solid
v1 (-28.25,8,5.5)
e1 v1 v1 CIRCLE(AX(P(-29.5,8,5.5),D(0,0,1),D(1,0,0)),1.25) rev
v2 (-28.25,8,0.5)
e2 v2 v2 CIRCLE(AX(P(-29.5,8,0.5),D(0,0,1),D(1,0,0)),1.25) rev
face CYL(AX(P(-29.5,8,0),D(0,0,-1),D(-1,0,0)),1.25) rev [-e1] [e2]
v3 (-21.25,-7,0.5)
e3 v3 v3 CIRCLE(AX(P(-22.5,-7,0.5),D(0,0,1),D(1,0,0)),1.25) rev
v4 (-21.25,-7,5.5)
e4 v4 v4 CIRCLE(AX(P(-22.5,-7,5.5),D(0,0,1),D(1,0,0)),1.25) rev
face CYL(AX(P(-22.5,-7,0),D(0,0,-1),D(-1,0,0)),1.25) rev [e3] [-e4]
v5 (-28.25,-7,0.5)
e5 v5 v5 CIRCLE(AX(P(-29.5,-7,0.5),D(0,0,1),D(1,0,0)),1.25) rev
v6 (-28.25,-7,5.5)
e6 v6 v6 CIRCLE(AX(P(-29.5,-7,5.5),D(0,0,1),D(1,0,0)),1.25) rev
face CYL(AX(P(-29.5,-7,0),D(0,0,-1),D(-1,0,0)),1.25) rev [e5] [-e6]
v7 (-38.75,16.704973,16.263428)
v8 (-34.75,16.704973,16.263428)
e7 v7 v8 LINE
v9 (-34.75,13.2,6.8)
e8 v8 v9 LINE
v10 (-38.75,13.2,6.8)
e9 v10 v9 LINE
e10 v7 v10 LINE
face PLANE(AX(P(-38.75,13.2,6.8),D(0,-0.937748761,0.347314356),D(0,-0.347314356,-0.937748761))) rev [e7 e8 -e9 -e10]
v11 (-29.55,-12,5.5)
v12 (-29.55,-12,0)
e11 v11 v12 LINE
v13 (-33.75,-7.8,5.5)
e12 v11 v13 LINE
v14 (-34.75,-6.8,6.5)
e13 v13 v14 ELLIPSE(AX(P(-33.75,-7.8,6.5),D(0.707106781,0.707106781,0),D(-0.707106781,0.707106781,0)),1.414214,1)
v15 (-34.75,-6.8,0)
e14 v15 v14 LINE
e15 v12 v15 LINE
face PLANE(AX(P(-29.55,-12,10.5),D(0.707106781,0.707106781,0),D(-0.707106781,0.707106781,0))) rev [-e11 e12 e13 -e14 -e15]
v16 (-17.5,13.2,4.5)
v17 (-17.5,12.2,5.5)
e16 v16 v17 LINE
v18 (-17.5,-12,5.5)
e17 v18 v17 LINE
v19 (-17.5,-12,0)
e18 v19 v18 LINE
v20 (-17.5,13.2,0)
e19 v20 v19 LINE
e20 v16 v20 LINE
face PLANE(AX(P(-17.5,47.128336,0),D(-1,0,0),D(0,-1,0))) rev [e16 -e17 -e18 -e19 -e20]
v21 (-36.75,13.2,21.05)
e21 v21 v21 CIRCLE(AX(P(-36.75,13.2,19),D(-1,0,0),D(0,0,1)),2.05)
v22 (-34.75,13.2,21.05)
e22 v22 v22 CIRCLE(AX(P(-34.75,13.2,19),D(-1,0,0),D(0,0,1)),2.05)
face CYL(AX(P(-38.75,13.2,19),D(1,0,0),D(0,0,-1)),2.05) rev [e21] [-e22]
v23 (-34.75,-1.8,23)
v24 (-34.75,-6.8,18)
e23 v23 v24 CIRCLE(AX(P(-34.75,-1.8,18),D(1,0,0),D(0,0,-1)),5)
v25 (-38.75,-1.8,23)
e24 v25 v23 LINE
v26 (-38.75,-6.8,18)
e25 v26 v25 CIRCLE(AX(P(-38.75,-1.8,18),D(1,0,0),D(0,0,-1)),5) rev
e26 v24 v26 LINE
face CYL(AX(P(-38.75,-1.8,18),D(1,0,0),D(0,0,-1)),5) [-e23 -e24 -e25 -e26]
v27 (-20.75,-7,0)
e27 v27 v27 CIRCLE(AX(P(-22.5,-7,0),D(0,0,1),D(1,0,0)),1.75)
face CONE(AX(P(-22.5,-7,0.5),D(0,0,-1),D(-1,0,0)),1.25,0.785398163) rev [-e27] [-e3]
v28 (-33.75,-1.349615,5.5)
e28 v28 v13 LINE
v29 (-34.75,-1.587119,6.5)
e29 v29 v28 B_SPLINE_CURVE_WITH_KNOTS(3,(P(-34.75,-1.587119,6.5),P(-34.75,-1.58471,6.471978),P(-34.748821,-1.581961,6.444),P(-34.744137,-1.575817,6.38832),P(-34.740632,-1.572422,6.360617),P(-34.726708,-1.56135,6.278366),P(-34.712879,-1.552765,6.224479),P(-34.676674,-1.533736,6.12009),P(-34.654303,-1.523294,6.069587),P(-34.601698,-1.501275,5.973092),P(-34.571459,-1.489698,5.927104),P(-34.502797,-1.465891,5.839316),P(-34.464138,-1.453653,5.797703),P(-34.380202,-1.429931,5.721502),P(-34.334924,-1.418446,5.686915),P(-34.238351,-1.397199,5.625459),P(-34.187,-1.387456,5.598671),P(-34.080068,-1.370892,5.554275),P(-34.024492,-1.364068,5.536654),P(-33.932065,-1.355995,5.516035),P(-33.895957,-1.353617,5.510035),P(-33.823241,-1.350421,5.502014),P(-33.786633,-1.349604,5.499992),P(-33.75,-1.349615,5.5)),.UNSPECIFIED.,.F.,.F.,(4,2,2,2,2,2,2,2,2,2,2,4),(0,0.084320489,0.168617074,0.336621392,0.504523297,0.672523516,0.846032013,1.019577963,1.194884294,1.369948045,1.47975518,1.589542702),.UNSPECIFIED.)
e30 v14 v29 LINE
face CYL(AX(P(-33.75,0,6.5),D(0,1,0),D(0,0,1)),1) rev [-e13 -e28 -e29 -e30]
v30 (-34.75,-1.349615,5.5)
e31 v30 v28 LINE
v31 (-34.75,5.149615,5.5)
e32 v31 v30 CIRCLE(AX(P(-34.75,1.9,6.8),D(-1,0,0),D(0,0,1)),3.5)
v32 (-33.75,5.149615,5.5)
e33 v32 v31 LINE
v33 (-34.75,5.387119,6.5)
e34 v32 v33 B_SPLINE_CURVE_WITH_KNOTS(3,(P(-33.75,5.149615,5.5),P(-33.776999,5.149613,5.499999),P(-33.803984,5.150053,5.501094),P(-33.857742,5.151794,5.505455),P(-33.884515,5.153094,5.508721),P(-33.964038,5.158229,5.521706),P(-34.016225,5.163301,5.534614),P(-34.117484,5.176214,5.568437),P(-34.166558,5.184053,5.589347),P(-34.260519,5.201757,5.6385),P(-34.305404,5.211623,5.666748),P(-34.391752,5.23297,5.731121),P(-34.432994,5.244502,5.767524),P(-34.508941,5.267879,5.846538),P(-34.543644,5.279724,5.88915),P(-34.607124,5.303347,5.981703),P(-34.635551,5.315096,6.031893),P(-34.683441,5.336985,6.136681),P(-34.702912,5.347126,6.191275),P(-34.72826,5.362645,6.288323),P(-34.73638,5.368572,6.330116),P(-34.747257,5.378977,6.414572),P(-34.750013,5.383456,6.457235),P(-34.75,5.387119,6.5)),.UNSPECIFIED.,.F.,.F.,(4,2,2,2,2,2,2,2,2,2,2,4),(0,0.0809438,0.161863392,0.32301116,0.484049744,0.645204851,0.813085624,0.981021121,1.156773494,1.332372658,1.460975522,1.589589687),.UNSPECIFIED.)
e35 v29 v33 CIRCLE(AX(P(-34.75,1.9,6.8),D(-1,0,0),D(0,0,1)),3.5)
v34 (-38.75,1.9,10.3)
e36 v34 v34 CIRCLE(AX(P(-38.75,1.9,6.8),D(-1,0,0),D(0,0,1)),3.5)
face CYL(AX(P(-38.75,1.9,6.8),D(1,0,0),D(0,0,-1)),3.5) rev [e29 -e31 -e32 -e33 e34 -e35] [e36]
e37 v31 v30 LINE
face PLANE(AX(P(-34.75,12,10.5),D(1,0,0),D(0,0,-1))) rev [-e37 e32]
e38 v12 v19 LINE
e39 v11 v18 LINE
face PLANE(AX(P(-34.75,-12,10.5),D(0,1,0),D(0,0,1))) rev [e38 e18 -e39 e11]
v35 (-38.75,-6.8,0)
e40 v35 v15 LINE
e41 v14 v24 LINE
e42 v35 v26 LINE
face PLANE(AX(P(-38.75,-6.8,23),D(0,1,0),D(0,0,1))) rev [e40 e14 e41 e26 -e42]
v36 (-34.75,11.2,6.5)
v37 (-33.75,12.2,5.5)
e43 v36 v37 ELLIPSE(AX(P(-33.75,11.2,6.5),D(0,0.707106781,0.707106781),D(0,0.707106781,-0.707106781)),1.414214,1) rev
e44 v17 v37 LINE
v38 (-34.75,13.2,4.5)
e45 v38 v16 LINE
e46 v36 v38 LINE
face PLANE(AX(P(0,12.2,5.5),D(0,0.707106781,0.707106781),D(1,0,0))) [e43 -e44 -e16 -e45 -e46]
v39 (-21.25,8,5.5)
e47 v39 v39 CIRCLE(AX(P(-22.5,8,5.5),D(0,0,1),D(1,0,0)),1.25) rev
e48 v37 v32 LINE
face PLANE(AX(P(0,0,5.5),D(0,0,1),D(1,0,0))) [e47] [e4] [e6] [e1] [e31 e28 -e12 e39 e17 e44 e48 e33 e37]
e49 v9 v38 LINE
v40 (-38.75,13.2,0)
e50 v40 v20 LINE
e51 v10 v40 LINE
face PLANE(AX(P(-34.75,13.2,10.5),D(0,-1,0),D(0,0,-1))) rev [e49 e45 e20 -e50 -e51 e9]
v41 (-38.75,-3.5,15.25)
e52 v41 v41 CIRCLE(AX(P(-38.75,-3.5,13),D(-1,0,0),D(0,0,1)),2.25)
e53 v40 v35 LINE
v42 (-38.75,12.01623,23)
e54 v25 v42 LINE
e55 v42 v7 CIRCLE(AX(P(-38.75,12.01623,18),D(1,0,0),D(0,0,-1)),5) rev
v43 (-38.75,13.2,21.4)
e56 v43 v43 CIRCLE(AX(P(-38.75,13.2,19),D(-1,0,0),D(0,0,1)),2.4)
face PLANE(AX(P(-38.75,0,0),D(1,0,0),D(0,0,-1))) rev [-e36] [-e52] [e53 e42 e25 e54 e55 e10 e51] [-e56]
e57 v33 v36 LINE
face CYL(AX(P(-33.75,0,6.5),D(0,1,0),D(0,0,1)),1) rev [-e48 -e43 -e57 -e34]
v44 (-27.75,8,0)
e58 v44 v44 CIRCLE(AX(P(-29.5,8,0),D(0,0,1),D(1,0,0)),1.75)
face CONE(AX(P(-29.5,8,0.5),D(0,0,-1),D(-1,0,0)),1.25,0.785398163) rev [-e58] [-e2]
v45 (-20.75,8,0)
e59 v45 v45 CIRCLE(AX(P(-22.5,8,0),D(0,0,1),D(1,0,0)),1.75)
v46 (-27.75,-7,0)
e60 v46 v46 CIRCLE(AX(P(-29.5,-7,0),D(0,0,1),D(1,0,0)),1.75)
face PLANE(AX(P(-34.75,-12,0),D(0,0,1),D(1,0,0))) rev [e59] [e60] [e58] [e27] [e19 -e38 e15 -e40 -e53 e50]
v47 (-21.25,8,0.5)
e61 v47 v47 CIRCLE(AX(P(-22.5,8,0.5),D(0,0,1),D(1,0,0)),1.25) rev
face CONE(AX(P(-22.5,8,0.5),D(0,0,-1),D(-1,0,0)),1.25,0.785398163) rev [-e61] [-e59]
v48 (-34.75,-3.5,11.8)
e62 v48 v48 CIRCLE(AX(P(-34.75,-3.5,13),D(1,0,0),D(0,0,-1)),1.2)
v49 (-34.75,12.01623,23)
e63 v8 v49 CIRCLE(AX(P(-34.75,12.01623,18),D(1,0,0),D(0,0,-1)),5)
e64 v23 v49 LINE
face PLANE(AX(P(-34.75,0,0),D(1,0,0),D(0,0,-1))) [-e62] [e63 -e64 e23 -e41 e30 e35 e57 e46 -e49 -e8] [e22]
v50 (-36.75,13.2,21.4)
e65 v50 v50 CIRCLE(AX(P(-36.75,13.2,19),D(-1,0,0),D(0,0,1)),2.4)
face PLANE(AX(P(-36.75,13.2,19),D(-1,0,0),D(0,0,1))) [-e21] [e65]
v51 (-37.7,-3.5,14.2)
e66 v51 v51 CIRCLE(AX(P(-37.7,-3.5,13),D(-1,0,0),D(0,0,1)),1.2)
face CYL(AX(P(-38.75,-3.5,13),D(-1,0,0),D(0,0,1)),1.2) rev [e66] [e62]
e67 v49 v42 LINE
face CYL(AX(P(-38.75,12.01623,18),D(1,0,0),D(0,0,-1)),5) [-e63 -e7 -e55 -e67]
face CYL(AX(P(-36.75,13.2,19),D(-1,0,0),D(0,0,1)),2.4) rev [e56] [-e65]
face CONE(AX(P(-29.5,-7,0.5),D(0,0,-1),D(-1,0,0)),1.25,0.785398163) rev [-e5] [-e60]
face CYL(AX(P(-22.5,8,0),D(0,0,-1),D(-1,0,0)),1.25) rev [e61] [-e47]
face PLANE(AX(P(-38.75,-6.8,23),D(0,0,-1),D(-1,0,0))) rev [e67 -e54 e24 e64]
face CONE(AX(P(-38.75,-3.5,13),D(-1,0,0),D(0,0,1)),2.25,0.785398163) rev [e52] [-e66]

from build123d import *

# Parameters (mm, degrees)
SKETCH_1_W             = 69.5
SKETCH_1_H             = 24
EXTRUDE_1_DEPTH        = 10.5
SKETCH_2_W             = 35
SKETCH_2_H             = 3
CUT_EXTRUDE_2_DEPTH    = 24
HOLE_WIZARD_M3_1_D     = 2.5
HOLE_WIZARD_M3_1_DEPTH = 7.5
HOLE_WIZARD_M3_1_TIP   = 0.751075774
CHAMFER_1_SIZE         = 0.5
CHAMFER_2_SIZE         = 0.5
CHAMFER_3_SIZE         = 5.2
FILLET1_R              = 2
SKETCH_8_W             = 10.5
SKETCH_8_H             = 1.2
EXTRUDE_1_2_DEPTH      = 69.5
SKETCH_7_W             = 35
SKETCH_7_H             = 30
CUT_EXTRUDE_1_DEPTH    = 71.5
FILLET_1_R             = 2
FILLET_2_R             = 2
SKETCH2_W              = 16.266114445
SKETCH2_H              = 35.800653755
SKETCH2_W_2            = 16.722173729
SKETCH2_H_2            = 38.308979815
EXTRUDE1_DEPTH         = 5
SKETCH4_R              = 2.05
SKETCH4_R_2            = 3.5
EXTRUDE2_DEPTH         = 4
FILLET2_R              = 5
SKETCH7_R              = 3.5
SKETCH7_R_2            = 2.05
EXTRUDE3_DEPTH         = 4
FILLET3_R              = 5
FILLET5_R              = 1
SKETCH14_R             = 2.4
EXTRUDE4_DEPTH         = 2
SKETCH15_R             = 2.4
EXTRUDE5_DEPTH         = 2
SKETCH_9_W             = 36.650882696
SKETCH_9_H             = 47.613245362
CUT_EXTRUDE_2_2_DEPTH  = 49.168282868
SKETCH_10_W            = 16.727542875
SKETCH_10_H            = 39.365484233
CUT_EXTRUDE_3_DEPTH    = 5
CHAMFER_8_SIZE         = 1
FILLET_4_R             = 1


with BuildPart() as part:
    # 草图1 → Extrude 1 (new body)
    with BuildSketch(Plane.XY):
        Rectangle(SKETCH_1_W, SKETCH_1_H)
    extrude(amount=EXTRUDE_1_DEPTH)

    # 草图2 → Cut-Extrude 2 (cut)
    with BuildSketch(Plane.XZ.offset(12)):
        with Locations((0, 1.5)):
            Rectangle(SKETCH_2_W, SKETCH_2_H)
    extrude(amount=-CUT_EXTRUDE_2_DEPTH, mode=Mode.SUBTRACT)

    # M3 螺纹孔1
    with Locations(Plane(origin=(22.5, 8, 0), x_dir=(-1, 0, 0), z_dir=(0, 0, -1))):
        with Locations((0, 0), (0, -15), (45, -15), (45, 0), (-7, 0), (-7, -15), (52, -15), (52, 0)):
            Hole(HOLE_WIZARD_M3_1_D / 2, depth=HOLE_WIZARD_M3_1_DEPTH)
            with Locations((0, 0, -(HOLE_WIZARD_M3_1_DEPTH + HOLE_WIZARD_M3_1_TIP / 2))):  # 118° drill point
                Cone(0, HOLE_WIZARD_M3_1_D / 2, HOLE_WIZARD_M3_1_TIP, mode=Mode.SUBTRACT)

    # 倒角1
    chamfer_1_edges = [part.edges().sort_by_distance(p)[0] for p in [
        (-23.75, 8, 0),
        (-23.75, -7, 0),
        (21.25, -7, 0),
        (21.25, 8, 0),
    ]]
    chamfer(chamfer_1_edges, length=CHAMFER_1_SIZE)

    # 倒角2
    chamfer_2_edges = [part.edges().sort_by_distance(p)[0] for p in [
        (-30.75, 8, 0),
        (-30.75, -7, 0),
        (28.25, -7, 0),
        (28.25, 8, 0),
    ]]
    chamfer(chamfer_2_edges, length=CHAMFER_2_SIZE)

    # 倒角3
    chamfer_3_edges = [part.edges().sort_by_distance(p)[0] for p in [
        (34.75, -12, 5.25),
        (-34.75, -12, 5.25),
    ]]
    chamfer(chamfer_3_edges, length=CHAMFER_3_SIZE)

    # Fillet1
    fillet1_edges = [part.edges().sort_by_distance(p)[0] for p in [
        (0, -12, 10.5),
    ]]
    fillet(fillet1_edges, radius=FILLET1_R)

    # 草图8 → Extrude 1 2 (add)
    with BuildSketch(Plane(origin=(34.75, 0, 0), x_dir=(0, 0, -1), z_dir=(1, 0, 0))):
        with Locations((-5.25, 12.6)):
            Rectangle(SKETCH_8_W, SKETCH_8_H)
    extrude(amount=-EXTRUDE_1_2_DEPTH)

    # 草图7 → 切除-拉伸1 (cut)
    with BuildSketch(Plane.XY.offset(10.5)):
        with Locations((0, 3)):
            Rectangle(SKETCH_7_W, SKETCH_7_H)
    extrude(amount=-CUT_EXTRUDE_1_DEPTH, mode=Mode.SUBTRACT)


with BuildPart() as cut_extrude_1_piece_1:
    # of the separate pieces the step leaves, piece 1, a body of its own (cut_extrude_1_pieces)
    add(part.part.solids().sort_by_distance((29.55, -12, 8.5))[0])

    # 圆角1
    fillet_1_edges = [cut_extrude_1_piece_1.edges().sort_by_distance(p)[0] for p in [
        (26.125, 13.2, 10.5),
    ]]
    fillet(fillet_1_edges, radius=FILLET_1_R)


with BuildPart() as cut_extrude_1_piece_2:
    # of the separate pieces the step leaves, piece 2, a body of its own (cut_extrude_1_pieces)
    add(part.part.solids().sort_by_distance((-29.55, -12, 8.5))[0])

    # 圆角2
    fillet_2_edges = [cut_extrude_1_piece_2.edges().sort_by_distance(p)[0] for p in [
        (-26.125, 13.2, 10.5),
    ]]
    fillet(fillet_2_edges, radius=FILLET_2_R)


with BuildPart() as extrude1_tool:
    # Sketch2 → Extrude1 (new body)
    with BuildSketch(Plane.XY.offset(10.5)):
        with Locations((34.133057222, -0.236108687)):
            Rectangle(SKETCH2_W, SKETCH2_H)
        with Locations((-34.361086865, 1.85416303)):
            Rectangle(SKETCH2_W_2, SKETCH2_H_2)
    extrude(amount=-EXTRUDE1_DEPTH)


with BuildPart() as cut_extrude_1_piece_1_1:
    add(cut_extrude_1_piece_1.part)

    # Extrude1: cut by extrude1_tool
    add(extrude1_tool.part, mode=Mode.SUBTRACT)

    # Sketch7 → Extrude3 (add)
    with BuildSketch(Plane(origin=(34.75, 0, 0), x_dir=(0, 0, -1), z_dir=(1, 0, 0))):
        Polygon((0, -6.797975685), (0, 13.202024315), (-6.8, 13.202024315), (-23, 19.202024315), (-23, -6.797975685), align=None)
        with Locations(Location((-6.8, 1.9, 0), (0, 0, 68.196252011))):
            Circle(SKETCH7_R, mode=Mode.SUBTRACT)
        with Locations(Location((-19, 13.2, 0), (0, 0, 180))):
            Circle(SKETCH7_R_2, mode=Mode.SUBTRACT)
    extrude(amount=EXTRUDE3_DEPTH)

    # Fillet3
    fillet3_edges = [cut_extrude_1_piece_1_1.edges().sort_by_distance(p)[0] for p in [
        (36.75, -6.797975685, 23),
        (36.75, 19.202024315, 23),
    ]]
    fillet(fillet3_edges, radius=FILLET3_R)

    # Sketch12 → CSK for M2 Slotted raised CTSK head wood (revolve, cut)
    with BuildSketch(Plane(origin=(38.75, -3.5, 13), x_dir=(0, 0, -1), z_dir=(0, 1, 0))):
        Polygon((0, 0), (0, 77.5), (1.2, 77.5), (1.2, 1.05), (2.25, 0), align=None)
    revolve(axis=Axis((45.1, -3.5, 13), (-1, 0, 0)), mode=Mode.SUBTRACT)

    # Fillet5
    # the kernel refuses this fillet: 1 mm, written as the material it adds along each edge
    with BuildSketch(Plane(origin=(26, -12, 5.5), x_dir=(1, 0, 0), z_dir=(0, 1, 0))) as fillet5_piece_1:
        with BuildLine():
            CenterArc((FILLET5_R, -FILLET5_R), FILLET5_R, 90, 90)
            Line((0, -FILLET5_R), (0, 0))
            Line((0, 0), (FILLET5_R, 0))
        make_face()
    extrude(amount=25.2)
    with BuildSketch(Plane(origin=(34.75, -6.797975685, 5.5), x_dir=(0, 0, 1), z_dir=(0, 1, 0))) as fillet5_piece_2_section:
        with BuildLine():
            CenterArc((FILLET5_R, -FILLET5_R), FILLET5_R, 90, 90)
            Line((0, -FILLET5_R), (0, 0))
            Line((0, 0), (FILLET5_R, 0))
        make_face()
    fillet5_piece_2 = extrude(amount=7.948360323, mode=Mode.PRIVATE)
    fillet5_piece_2 = fillet5_piece_2 - Plane(origin=(34.525455487, 1.9, 6.8), x_dir=(0, 0.9284615319608756, -0.371428571422372), z_dir=(-1, 0, 0)) * Cylinder(3.5, 20, mode=Mode.PRIVATE)
    add(fillet5_piece_2)
    with BuildSketch(Plane(origin=(34.75, 2.649615362, 5.5), x_dir=(0, 0, 1), z_dir=(0, 1, 0))) as fillet5_piece_3_section:
        with BuildLine():
            CenterArc((FILLET5_R, -FILLET5_R), FILLET5_R, 90, 90)
            Line((0, -FILLET5_R), (0, 0))
            Line((0, 0), (FILLET5_R, 0))
        make_face()
    fillet5_piece_3 = extrude(amount=10.550384638, mode=Mode.PRIVATE)
    fillet5_piece_3 = fillet5_piece_3 - Plane(origin=(34.525839379, 1.9, 6.8), x_dir=(0, 0.9284615319608756, -0.371428571422372), z_dir=(-1, 0, 0)) * Cylinder(3.5, 26, mode=Mode.PRIVATE)
    add(fillet5_piece_3)

    # Sketch15 → Extrude5 (cut)
    with BuildSketch(Plane(origin=(38.75, 0, 0), x_dir=(0, 0, -1), z_dir=(1, 0, 0))):
        with Locations(Location((-19, 13.2, 0), (0, 0, 180))):
            Circle(SKETCH15_R)
    extrude(amount=-EXTRUDE5_DEPTH, mode=Mode.SUBTRACT)

    # 草图9 → Cut-Extrude 2 2 (cut, through all)
    with BuildSketch(Plane.XY.offset(23)):
        with Locations((21.816576683, -0.846593787)):
            Rectangle(SKETCH_9_W, SKETCH_9_H)
    extrude(amount=-CUT_EXTRUDE_2_2_DEPTH, mode=Mode.SUBTRACT)


with BuildPart() as cut_extrude_1_piece_2_1:
    add(cut_extrude_1_piece_2.part)

    # Extrude1: cut by extrude1_tool
    add(extrude1_tool.part, mode=Mode.SUBTRACT)

    # Sketch4 → Extrude2 (add)
    with BuildSketch(Plane.ZY.offset(34.75)):
        Polygon((0, -6.8), (0, 13.2), (6.8, 13.2), (23, 19.2), (23, -6.8), align=None)
        with Locations((19, 13.2)):
            Circle(SKETCH4_R, mode=Mode.SUBTRACT)
        with Locations(Location((6.8, 1.9, 0), (0, 0, 111.803747989))):
            Circle(SKETCH4_R_2, mode=Mode.SUBTRACT)
    extrude(amount=EXTRUDE2_DEPTH)

    # Fillet2
    fillet2_edges = [cut_extrude_1_piece_2_1.edges().sort_by_distance(p)[0] for p in [
        (-36.75, -6.8, 23),
        (-36.75, 19.2, 23),
    ]]
    fillet(fillet2_edges, radius=FILLET2_R)

    # Sketch13 → CSK for M2 Slotted raised CTSK head  2 (revolve, cut)
    with BuildSketch(Plane(origin=(-38.75, -3.5, 13), x_dir=(0, 0, 1), z_dir=(0, 1, 0))):
        Polygon((0, 0), (0, 4), (1.2, 4), (1.2, 1.05), (2.25, 0), align=None)
    revolve(axis=Axis((-45.1, -3.5, 13), (1, 0, 0)), mode=Mode.SUBTRACT)

    # Sketch14 → Extrude4 (cut)
    with BuildSketch(Plane.ZY.offset(38.75)):
        with Locations((19, 13.2)):
            Circle(SKETCH14_R)
    extrude(amount=-EXTRUDE4_DEPTH, mode=Mode.SUBTRACT)

    # 草图10 → 切除-拉伸3 (cut)
    with BuildSketch(Plane.XY.offset(10.5)):
        with Locations((-20.237373351, 1.950530044)):
            Rectangle(SKETCH_10_W, SKETCH_10_H)
    extrude(amount=-CUT_EXTRUDE_3_DEPTH, mode=Mode.SUBTRACT)

    # 倒角8
    chamfer_8_edges = [cut_extrude_1_piece_2_1.edges().sort_by_distance(p)[0] for p in [
        (-26.125, 13.2, 5.5),
    ]]
    chamfer(chamfer_8_edges, length=CHAMFER_8_SIZE)

    # 圆角4
    # the kernel refuses this fillet: 1 mm, written as the material it adds along each edge
    with BuildSketch(Plane(origin=(-34.75, 14.7, 5.5), x_dir=(0, 0, 1), z_dir=(0, -1, 0))) as fillet_4_piece_1_section:
        with BuildLine():
            CenterArc((FILLET_4_R, -FILLET_4_R), FILLET_4_R, 90, 90)
            Line((0, -FILLET_4_R), (0, 0))
            Line((0, 0), (FILLET_4_R, 0))
        make_face()
    fillet_4_piece_1 = extrude(amount=12.050384638, mode=Mode.PRIVATE)
    fillet_4_piece_1 = fillet_4_piece_1 - Plane(origin=(-34.522632455, 1.9, 6.8), x_dir=(0, 0.9284615319608756, -0.3714285714223719), z_dir=(1, 0, 0)) * Cylinder(3.5, 29, mode=Mode.PRIVATE)
    fillet_4_piece_1 = split(fillet_4_piece_1, bisect_by=Plane(origin=(-34.522632455, 10.293168588, 7.406831412), z_dir=(0, -0.7071067811865476, -0.7071067811865476)), keep=Keep.TOP, mode=Mode.PRIVATE)
    add(fillet_4_piece_1)
    with BuildSketch(Plane(origin=(-34.75, 1.150384638, 5.5), x_dir=(0, 0, 1), z_dir=(0, -1, 0))) as fillet_4_piece_2_section:
        with BuildLine():
            CenterArc((FILLET_4_R, -FILLET_4_R), FILLET_4_R, 90, 90)
            Line((0, -FILLET_4_R), (0, 0))
            Line((0, 0), (FILLET_4_R, 0))
        make_face()
    fillet_4_piece_2 = extrude(amount=10.450384638, mode=Mode.PRIVATE)
    fillet_4_piece_2 = split(fillet_4_piece_2, bisect_by=Plane(origin=(-35.981733075, -5.568266925, 5.72144918), z_dir=(0.7071067811865476, 0.7071067811865475, 0)), keep=Keep.TOP, mode=Mode.PRIVATE)
    fillet_4_piece_2 = fillet_4_piece_2 - Plane(origin=(-34.525455927, 1.9, 6.8), x_dir=(0, 0.9284615319608756, -0.3714285714223719), z_dir=(1, 0, 0)) * Cylinder(3.5, 25, mode=Mode.PRIVATE)
    add(fillet_4_piece_2)


solid = cut_extrude_1_piece_2_1.part
